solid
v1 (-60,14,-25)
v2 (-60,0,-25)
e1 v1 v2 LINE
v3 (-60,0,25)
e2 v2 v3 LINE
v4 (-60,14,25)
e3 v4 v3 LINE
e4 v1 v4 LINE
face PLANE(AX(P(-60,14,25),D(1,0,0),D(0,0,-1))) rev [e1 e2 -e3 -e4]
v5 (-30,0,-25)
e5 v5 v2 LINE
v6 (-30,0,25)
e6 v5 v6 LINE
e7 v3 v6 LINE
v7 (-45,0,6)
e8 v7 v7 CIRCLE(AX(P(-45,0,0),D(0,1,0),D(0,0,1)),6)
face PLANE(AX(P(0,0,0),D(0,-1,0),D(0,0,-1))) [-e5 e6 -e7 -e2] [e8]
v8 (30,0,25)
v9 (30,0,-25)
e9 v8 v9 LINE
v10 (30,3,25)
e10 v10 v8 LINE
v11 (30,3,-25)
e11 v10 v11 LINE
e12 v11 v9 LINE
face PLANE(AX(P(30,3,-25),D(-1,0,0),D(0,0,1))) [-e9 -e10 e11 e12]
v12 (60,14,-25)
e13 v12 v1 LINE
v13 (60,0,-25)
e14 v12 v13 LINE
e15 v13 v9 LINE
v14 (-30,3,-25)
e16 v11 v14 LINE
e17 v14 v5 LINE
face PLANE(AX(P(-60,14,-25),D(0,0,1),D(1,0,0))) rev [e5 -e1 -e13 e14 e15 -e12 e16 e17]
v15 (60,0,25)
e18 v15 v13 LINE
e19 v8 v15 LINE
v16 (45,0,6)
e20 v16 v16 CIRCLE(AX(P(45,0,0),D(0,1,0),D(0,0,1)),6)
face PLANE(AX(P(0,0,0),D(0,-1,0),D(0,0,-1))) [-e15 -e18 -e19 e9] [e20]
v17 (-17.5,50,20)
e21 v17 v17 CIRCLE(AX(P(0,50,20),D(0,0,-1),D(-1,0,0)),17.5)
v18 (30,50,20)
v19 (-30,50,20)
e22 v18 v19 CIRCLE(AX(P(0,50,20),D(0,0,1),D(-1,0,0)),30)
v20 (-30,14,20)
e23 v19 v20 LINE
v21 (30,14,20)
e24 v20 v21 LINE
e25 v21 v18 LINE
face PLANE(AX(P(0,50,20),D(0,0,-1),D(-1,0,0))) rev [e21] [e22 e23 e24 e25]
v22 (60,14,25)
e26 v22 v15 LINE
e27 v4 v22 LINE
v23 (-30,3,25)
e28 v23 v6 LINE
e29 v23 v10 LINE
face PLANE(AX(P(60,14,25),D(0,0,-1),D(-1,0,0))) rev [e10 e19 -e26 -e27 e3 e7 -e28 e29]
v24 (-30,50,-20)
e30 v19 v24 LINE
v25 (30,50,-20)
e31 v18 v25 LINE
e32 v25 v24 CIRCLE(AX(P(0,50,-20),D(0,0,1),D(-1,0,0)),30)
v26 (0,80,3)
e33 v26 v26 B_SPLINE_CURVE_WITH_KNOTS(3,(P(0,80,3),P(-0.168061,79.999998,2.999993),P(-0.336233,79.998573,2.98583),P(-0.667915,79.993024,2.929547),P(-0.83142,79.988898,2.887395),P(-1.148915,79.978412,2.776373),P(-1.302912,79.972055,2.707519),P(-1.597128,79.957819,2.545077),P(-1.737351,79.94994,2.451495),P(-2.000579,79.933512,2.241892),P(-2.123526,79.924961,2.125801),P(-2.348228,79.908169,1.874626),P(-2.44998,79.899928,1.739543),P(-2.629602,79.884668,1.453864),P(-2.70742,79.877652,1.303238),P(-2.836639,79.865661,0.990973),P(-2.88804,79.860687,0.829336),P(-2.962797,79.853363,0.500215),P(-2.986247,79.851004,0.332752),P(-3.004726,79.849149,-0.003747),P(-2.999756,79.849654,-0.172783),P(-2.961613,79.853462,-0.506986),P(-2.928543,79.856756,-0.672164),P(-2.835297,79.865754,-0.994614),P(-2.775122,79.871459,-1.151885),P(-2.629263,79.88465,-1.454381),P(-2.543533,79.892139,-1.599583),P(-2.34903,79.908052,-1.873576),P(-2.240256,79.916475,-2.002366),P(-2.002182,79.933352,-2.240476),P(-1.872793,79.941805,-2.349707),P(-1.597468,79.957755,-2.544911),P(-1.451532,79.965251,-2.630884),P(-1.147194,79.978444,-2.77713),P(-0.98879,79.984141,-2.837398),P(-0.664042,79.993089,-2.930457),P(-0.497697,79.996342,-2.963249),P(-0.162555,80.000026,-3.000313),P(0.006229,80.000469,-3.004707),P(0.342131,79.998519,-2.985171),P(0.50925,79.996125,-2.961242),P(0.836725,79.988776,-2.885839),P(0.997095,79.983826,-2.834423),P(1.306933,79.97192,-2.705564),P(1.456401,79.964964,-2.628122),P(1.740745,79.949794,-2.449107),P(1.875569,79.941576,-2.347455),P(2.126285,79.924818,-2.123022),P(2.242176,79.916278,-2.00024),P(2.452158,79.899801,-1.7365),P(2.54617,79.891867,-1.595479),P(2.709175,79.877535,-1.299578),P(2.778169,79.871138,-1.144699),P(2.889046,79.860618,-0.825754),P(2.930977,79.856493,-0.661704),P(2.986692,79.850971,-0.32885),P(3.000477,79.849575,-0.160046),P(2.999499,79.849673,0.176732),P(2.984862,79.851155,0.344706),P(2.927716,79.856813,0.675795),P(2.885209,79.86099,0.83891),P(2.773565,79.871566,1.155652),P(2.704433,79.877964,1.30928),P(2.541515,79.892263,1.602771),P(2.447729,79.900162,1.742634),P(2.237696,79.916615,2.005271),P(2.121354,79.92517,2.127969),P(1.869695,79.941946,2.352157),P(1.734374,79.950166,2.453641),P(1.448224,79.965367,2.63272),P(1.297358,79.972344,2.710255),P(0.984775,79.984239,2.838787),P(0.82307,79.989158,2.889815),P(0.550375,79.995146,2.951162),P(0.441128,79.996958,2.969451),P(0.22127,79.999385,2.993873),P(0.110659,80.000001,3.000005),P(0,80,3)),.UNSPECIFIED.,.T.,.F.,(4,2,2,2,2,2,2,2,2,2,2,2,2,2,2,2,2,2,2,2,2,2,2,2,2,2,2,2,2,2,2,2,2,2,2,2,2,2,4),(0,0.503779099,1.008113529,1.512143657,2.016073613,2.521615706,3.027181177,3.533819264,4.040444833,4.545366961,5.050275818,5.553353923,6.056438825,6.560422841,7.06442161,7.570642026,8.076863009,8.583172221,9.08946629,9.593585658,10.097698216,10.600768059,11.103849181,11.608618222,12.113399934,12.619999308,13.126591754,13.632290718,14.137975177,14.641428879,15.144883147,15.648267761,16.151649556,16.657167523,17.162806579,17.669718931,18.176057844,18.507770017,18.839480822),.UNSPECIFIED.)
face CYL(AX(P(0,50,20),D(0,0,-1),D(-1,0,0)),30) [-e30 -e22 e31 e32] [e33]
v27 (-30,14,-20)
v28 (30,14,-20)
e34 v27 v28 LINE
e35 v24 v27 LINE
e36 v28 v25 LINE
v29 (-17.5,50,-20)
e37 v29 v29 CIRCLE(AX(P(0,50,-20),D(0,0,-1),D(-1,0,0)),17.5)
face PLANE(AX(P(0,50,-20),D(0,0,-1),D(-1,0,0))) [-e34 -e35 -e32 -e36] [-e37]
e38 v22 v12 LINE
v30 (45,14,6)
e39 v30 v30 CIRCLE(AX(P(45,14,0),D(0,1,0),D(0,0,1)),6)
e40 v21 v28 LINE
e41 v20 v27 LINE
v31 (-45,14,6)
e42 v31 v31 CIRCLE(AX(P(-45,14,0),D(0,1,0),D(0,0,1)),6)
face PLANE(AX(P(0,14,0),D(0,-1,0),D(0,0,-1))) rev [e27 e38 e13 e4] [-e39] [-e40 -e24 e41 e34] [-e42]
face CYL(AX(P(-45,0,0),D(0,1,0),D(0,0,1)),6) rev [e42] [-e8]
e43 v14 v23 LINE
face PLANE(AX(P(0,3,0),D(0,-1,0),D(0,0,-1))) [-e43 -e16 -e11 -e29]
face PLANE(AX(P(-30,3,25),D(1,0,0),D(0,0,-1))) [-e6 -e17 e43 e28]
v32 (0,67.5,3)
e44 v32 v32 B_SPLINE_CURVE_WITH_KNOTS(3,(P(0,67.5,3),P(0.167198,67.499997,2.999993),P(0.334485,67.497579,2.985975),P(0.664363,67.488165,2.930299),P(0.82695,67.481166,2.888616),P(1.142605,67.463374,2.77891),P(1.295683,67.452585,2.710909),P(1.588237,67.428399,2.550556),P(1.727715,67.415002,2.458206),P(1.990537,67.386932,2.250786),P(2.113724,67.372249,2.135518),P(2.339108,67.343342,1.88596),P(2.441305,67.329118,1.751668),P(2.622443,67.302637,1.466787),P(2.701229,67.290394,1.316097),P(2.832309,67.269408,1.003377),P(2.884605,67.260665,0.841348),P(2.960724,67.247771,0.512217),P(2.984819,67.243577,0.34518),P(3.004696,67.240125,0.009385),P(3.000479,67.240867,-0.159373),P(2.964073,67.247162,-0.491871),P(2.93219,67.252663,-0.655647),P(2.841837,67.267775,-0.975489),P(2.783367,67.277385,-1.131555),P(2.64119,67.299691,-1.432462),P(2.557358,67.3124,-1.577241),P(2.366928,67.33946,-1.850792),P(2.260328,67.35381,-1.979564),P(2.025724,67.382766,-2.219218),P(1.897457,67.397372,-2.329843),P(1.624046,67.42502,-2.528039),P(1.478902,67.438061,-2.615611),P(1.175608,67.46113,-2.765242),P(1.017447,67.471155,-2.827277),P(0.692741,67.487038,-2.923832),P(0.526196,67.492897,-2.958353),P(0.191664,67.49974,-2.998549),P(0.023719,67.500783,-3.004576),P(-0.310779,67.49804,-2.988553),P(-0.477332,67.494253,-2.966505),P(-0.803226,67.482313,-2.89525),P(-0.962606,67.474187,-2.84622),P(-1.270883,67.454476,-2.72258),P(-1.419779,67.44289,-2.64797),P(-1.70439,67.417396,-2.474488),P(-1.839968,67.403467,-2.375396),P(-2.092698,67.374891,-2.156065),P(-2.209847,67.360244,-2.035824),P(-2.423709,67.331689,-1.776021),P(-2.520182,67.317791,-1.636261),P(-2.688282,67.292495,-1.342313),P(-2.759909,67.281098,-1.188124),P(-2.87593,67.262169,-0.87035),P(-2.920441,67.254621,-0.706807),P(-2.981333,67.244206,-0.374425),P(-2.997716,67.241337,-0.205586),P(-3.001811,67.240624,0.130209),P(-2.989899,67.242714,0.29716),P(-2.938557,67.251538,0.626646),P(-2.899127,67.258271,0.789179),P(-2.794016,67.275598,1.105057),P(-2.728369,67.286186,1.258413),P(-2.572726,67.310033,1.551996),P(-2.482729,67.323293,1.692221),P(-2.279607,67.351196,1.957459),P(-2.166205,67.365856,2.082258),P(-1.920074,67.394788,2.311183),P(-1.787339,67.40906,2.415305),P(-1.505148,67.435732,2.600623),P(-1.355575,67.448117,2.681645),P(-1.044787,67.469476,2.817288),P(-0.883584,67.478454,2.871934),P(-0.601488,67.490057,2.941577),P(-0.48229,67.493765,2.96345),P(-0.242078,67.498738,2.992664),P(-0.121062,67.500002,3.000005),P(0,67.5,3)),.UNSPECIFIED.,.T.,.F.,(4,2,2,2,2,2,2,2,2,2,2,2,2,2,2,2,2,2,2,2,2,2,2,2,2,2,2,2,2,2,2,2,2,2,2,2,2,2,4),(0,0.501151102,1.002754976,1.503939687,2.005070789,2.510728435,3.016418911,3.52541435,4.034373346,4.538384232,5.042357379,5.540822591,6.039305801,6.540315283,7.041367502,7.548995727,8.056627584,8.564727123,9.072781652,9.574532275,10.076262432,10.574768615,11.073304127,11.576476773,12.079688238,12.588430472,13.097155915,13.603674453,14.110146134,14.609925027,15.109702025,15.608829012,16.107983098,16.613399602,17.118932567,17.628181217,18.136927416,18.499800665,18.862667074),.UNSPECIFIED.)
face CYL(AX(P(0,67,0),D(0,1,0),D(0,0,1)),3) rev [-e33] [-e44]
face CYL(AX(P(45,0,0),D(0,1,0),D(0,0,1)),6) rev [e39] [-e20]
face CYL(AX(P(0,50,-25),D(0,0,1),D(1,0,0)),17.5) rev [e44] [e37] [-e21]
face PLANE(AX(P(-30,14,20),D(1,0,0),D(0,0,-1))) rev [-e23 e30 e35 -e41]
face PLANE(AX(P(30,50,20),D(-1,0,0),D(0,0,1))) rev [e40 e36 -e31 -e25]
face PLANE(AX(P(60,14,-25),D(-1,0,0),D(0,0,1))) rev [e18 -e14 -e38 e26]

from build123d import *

# Parameters (mm, degrees)
SKETCH_1_W          = 120
SKETCH_1_H          = 50
EXTRUDE_1_DEPTH     = 14
EXTRUDE_START       = -20
EXTRUDE_3_DEPTH     = 40
SKETCH_4_R          = 17.5
CUT_EXTRUDE_1_DEPTH = 112.803398875
SKETCH_5_W          = 60
SKETCH_5_H          = 50
CUT_EXTRUDE_2_DEPTH = 3
SKETCH_6_R          = 6
CUT_EXTRUDE_3_DEPTH = 93.633687177
SKETCH_7_R          = 3
CUT_EXTRUDE_4_DEPTH = 13


# Read off the part's stored shape, not the designer's step: 凸台-拉伸3
with BuildPart() as part:
    # 草图1 → 凸台-拉伸1 (new body)
    with BuildSketch(Plane(origin=(0, 0, 0), x_dir=(1, 0, 0), z_dir=(0, 1, 0))):
        Rectangle(SKETCH_1_W, SKETCH_1_H)
    extrude(amount=EXTRUDE_1_DEPTH)

    # 凸台-拉伸3 outline → 凸台-拉伸3 (add)
    with BuildSketch(Plane.XY.offset(EXTRUDE_START)):
        with BuildLine():
            Line((30, 14), (30, 50))
            ThreePointArc((30, 50), (0, 80), (-30, 50))
            Line((-30, 50), (-30, 14))
            Line((-30, 14), (30, 14))
        make_face()
    extrude(amount=EXTRUDE_3_DEPTH)

    # 草图4 → 切除-拉伸1 (cut, through all)
    with BuildSketch(Plane.XY.offset(25)):
        with Locations(Location((0, 50, 0), (0, 0, 180))):
            Circle(SKETCH_4_R)
    extrude(amount=-CUT_EXTRUDE_1_DEPTH, mode=Mode.SUBTRACT)

    # 草图5 → 切除-拉伸2 (cut)
    with BuildSketch(Plane(origin=(0, 0, 0), x_dir=(1, 0, 0), z_dir=(0, 1, 0))):
        Rectangle(SKETCH_5_W, SKETCH_5_H)
    extrude(amount=CUT_EXTRUDE_2_DEPTH, mode=Mode.SUBTRACT)

    # 草图6 → 切除-拉伸3 (cut, through all)
    with BuildSketch(Plane(origin=(0, 14, 0), x_dir=(1, 0, 0), z_dir=(0, 1, 0))):
        with Locations(Location((-45, 0, 0), (0, 0, 270))):
            Circle(SKETCH_6_R)
        with Locations(Location((45, 0, 0), (0, 0, 270))):
            Circle(SKETCH_6_R)
    extrude(amount=-CUT_EXTRUDE_3_DEPTH, mode=Mode.SUBTRACT)

    # 草图7 → 切除-拉伸4 (cut)
    with BuildSketch(Plane(origin=(0, 80, 0), x_dir=(1, 0, 0), z_dir=(0, 1, 0))):
        with Locations(Location((0, 0, 0), (0, 0, 270))):
            Circle(SKETCH_7_R)
    extrude(amount=-CUT_EXTRUDE_4_DEPTH, mode=Mode.SUBTRACT)


solid = part.part
